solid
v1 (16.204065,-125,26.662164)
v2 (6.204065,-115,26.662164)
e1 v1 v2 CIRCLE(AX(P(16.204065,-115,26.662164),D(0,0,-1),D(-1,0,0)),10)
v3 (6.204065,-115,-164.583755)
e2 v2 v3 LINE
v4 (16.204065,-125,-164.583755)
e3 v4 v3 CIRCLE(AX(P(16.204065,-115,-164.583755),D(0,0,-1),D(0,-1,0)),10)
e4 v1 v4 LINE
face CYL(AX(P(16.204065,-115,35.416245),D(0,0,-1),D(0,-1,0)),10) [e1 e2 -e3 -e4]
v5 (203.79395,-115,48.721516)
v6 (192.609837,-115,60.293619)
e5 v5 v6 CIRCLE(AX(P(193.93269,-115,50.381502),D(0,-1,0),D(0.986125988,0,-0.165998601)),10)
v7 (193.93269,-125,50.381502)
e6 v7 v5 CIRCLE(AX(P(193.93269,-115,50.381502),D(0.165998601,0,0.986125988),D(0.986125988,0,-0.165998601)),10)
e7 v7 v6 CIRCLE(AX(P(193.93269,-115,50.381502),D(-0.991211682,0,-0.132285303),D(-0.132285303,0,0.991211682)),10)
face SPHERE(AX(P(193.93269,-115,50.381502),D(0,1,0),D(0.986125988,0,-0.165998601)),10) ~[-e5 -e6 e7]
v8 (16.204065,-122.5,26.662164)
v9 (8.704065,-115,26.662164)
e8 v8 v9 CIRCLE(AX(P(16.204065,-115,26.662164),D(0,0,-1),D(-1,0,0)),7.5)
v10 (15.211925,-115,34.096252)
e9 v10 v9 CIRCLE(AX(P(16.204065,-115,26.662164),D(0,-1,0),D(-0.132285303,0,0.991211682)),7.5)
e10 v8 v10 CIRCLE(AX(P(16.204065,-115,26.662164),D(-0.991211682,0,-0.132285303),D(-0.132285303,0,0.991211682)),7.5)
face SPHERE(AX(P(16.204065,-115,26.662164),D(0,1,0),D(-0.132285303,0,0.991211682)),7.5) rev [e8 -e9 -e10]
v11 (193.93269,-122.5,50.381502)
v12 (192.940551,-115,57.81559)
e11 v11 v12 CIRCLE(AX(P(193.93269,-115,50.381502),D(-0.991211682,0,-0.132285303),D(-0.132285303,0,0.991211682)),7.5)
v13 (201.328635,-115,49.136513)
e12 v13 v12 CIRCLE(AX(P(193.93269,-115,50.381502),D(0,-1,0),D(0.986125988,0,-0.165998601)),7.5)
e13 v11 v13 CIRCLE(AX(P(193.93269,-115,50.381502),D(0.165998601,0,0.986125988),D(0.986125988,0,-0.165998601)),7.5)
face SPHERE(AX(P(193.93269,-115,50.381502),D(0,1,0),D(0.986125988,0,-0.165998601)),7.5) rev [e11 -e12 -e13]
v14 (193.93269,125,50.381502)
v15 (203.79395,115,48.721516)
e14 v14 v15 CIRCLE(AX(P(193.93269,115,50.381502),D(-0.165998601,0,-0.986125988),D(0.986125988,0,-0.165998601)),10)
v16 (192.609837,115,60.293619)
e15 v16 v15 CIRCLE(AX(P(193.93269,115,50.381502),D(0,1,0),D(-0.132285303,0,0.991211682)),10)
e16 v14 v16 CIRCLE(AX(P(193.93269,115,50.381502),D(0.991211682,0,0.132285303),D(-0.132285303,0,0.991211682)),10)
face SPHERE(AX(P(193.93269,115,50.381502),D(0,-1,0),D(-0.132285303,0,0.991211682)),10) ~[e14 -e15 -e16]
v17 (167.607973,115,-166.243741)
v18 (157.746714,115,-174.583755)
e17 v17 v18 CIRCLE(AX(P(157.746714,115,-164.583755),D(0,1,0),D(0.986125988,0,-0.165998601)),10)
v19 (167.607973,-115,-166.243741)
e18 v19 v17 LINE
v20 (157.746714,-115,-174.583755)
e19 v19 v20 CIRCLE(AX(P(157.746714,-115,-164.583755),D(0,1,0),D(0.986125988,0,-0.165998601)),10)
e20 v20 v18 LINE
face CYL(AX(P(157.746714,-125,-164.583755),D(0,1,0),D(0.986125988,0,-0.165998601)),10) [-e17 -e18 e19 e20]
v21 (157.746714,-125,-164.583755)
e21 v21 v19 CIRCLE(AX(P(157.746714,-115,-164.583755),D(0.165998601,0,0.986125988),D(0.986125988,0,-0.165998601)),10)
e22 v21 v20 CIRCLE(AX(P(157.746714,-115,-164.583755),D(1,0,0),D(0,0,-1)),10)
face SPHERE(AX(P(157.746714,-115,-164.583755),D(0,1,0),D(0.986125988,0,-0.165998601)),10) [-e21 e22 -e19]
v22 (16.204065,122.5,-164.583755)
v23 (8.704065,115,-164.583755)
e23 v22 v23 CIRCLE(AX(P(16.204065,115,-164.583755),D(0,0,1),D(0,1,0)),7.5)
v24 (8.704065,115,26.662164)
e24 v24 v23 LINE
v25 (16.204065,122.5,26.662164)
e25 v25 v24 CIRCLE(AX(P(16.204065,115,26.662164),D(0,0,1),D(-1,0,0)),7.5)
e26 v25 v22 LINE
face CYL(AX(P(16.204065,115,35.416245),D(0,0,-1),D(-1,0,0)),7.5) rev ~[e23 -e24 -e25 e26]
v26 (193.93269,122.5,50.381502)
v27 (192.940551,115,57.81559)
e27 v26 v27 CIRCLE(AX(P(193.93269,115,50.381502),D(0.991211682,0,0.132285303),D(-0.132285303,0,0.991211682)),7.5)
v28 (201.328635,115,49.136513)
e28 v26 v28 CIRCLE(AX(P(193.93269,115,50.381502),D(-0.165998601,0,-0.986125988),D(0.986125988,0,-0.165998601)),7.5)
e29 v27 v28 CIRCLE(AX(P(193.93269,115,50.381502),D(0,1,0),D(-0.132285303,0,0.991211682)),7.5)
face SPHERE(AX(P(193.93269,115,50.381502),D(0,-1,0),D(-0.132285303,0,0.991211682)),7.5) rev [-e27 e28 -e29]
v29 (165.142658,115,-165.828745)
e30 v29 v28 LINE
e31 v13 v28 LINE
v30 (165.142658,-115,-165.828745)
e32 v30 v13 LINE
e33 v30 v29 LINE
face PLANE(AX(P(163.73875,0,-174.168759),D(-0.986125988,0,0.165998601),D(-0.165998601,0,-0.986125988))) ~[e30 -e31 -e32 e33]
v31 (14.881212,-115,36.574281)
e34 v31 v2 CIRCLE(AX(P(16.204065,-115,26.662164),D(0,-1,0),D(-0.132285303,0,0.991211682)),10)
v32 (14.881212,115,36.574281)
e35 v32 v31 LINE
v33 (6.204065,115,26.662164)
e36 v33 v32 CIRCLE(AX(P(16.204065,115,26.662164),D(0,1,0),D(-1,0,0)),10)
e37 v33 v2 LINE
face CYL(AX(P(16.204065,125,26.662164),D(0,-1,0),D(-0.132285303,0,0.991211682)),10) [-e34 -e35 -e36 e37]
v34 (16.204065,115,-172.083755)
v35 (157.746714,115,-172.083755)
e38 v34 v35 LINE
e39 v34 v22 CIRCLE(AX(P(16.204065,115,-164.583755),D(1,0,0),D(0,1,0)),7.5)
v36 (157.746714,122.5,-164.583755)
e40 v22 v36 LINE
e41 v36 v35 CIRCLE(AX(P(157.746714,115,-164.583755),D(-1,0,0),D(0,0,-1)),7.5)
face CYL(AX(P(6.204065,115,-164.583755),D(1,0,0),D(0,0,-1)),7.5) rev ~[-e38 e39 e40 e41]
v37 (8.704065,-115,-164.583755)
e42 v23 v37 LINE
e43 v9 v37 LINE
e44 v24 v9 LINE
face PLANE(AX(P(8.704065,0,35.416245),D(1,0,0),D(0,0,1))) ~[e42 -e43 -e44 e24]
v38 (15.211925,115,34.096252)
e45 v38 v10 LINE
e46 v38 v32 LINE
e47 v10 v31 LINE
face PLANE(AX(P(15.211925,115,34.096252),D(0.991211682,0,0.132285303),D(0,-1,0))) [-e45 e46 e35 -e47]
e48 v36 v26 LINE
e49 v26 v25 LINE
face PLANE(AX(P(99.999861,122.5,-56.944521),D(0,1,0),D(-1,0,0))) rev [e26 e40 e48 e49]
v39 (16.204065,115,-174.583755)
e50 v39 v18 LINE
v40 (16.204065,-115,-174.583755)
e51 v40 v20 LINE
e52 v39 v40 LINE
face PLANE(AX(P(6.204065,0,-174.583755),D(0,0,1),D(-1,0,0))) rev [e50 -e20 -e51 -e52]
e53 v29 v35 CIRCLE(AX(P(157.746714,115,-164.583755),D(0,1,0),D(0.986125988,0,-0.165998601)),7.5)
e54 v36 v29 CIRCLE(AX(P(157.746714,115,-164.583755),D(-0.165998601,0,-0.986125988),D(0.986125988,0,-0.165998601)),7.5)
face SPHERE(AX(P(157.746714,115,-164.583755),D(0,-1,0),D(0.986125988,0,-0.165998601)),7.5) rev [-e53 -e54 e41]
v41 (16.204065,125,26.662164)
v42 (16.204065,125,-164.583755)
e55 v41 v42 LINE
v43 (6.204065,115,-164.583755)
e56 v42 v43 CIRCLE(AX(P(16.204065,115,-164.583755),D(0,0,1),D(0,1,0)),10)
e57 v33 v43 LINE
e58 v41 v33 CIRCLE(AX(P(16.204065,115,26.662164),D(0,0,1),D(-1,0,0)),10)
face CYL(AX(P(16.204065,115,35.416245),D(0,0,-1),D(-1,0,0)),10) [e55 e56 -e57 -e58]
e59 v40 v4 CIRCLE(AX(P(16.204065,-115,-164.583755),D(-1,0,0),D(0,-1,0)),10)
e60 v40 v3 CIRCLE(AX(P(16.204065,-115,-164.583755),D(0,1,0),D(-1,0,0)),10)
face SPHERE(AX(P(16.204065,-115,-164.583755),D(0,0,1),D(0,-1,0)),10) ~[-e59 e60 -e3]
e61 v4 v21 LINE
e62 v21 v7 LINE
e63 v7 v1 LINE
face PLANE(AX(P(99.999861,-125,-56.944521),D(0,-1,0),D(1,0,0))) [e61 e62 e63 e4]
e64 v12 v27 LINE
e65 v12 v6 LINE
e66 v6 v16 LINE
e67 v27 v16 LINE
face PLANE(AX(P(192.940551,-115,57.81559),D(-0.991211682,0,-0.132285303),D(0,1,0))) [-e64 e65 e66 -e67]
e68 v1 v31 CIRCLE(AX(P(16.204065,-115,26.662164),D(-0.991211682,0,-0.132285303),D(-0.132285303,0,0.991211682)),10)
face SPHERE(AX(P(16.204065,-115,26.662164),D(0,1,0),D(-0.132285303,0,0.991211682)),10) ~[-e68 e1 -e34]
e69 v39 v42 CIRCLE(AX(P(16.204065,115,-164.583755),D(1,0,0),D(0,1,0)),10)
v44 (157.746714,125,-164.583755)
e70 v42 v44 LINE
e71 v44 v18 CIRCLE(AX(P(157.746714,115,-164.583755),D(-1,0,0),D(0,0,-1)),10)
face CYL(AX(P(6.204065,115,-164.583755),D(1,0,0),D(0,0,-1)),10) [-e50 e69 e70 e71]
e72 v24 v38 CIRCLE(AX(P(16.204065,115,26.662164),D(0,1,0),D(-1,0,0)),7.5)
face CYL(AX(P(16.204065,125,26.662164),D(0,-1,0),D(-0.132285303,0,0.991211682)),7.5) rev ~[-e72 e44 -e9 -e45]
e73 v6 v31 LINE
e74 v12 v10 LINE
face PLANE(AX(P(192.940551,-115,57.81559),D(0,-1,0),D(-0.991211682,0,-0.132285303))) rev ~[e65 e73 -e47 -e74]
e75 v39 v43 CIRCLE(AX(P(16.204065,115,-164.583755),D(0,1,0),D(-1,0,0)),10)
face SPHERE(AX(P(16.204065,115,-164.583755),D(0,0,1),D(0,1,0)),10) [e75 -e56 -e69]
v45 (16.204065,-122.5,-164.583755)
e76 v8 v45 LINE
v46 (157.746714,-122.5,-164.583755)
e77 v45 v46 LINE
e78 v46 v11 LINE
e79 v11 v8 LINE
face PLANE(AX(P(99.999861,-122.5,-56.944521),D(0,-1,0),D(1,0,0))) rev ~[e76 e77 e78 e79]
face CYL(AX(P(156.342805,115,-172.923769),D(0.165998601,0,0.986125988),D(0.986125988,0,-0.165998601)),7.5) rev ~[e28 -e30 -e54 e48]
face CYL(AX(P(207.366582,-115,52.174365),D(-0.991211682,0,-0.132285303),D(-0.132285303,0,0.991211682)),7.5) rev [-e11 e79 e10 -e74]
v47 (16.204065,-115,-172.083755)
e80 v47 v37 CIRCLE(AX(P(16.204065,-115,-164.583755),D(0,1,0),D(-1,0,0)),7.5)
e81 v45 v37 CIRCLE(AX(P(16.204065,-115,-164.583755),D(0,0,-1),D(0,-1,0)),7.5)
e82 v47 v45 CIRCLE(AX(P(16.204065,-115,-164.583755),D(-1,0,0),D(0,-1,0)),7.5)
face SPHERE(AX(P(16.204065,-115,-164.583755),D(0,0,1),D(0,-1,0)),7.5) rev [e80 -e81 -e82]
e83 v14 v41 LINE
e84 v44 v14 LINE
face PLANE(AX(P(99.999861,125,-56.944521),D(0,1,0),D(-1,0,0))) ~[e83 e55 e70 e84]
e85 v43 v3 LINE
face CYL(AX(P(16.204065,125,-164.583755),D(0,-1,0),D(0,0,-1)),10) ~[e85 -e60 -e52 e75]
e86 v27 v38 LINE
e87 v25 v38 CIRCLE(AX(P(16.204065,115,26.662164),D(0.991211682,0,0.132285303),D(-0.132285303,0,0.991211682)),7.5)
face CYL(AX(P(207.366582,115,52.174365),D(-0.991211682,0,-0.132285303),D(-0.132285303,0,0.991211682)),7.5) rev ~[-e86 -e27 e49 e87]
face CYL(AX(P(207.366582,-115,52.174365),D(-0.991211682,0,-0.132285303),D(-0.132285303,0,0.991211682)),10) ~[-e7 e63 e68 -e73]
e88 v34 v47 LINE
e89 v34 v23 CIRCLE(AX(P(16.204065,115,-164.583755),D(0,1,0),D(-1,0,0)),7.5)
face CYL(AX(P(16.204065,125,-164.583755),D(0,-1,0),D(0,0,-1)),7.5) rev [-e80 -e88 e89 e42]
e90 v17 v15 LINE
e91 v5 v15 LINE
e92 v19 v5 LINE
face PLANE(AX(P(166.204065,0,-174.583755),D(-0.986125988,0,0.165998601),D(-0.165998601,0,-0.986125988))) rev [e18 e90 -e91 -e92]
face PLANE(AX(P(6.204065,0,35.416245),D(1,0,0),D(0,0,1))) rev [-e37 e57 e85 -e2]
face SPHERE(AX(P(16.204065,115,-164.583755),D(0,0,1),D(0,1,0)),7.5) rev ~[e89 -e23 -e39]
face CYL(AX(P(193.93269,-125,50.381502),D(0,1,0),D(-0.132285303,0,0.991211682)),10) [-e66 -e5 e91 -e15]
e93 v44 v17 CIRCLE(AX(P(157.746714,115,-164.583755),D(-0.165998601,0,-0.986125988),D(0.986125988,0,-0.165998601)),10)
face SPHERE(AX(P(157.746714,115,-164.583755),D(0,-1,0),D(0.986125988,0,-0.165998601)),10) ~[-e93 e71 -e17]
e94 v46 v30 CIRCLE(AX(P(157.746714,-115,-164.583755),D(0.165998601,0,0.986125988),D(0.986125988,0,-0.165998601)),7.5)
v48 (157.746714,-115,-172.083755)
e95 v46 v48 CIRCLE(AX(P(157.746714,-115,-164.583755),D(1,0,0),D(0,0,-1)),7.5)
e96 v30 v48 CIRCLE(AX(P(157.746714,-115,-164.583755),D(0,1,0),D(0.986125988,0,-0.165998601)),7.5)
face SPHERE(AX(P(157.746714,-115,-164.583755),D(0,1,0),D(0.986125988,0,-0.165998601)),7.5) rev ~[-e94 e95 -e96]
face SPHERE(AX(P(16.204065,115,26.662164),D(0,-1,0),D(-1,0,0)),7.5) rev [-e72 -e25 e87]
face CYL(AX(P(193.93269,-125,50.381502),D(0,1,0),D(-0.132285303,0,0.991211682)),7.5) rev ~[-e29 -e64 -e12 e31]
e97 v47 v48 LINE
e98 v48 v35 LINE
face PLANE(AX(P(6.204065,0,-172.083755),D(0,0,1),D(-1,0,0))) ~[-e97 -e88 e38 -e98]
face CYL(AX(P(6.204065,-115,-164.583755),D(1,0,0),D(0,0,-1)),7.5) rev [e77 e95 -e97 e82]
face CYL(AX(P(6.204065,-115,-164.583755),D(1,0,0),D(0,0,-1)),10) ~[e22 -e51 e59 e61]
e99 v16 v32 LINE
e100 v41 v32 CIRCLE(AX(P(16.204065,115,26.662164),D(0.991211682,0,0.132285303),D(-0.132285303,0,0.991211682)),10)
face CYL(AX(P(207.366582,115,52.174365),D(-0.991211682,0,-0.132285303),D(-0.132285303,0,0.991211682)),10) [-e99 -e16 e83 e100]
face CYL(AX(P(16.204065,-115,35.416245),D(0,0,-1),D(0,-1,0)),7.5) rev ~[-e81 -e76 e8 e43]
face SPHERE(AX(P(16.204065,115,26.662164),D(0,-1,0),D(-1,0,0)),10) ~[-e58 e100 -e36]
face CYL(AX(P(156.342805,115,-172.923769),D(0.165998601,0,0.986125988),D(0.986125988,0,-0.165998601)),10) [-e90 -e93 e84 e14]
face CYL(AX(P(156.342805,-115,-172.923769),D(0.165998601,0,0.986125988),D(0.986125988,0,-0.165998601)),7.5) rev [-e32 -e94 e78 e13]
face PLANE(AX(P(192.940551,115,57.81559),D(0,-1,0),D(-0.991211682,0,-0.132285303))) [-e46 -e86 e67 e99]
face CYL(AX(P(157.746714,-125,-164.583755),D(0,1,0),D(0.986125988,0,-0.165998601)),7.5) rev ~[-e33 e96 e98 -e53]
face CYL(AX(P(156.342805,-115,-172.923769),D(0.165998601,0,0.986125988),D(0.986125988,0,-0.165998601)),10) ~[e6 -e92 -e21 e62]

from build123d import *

# Parameters (mm, degrees)
F1_DEPTH = 125
F3_R     = 10
F4_T     = -2.5


# Not quite as in the source:
# - a shell that OpenCascade refuses in one call is made with other operations: the cavity is built on its own and cut out


with BuildPart() as f1:
    # F0 (on Front) → F1 (new body)
    with BuildSketch(Plane.XZ):
        Polygon((206.0437292722, 62.0864819473), (6.2040649354, 35.4162448123), (6.2040649354, -174.5837551877), (166.2040649354, -174.5837551877), align=None)
    extrude(amount=F1_DEPTH)

    # F2: F1 across plane


with BuildPart() as f1_1:
    add(f1.part)
    add(f1.part.mirror(Plane.XZ))

    # F3
    f3_edges = [f1_1.edges().sort_by_distance(p)[0] for p in [
        (106.123897, -125, 48.751363),
        (206.043729, 0, 62.086482),
        (186.123897, -125, -56.248637),
        (6.204065, -125, -69.583755),
        (86.204065, -125, -174.583755),
        (166.204065, 0, -174.583755),
        (106.123897, 125, 48.751363),
        (6.204065, 0, 35.416245),
        (186.123897, 125, -56.248637),
        (6.204065, 125, -69.583755),
        (86.204065, 125, -174.583755),
        (6.204065, 0, -174.583755),
    ]]
    fillet(f3_edges, radius=F3_R)

    # F4: a shell. OpenCascade refuses it in one call, so the cavity is built on its own and cut out:
    # the body offset inwards by the wall thickness, plus a prism from it out through each open face.
    f4_core = offset(f1_1.part, amount=F4_T, mode=Mode.PRIVATE)
    f4_exits = [f4_core.faces().sort_by_distance(p)[0] for p in [
        (104.076238, 0, 45.955921),
    ]]
    add(f4_core, mode=Mode.SUBTRACT)
    extrude(f4_exits, amount=-F4_T, mode=Mode.SUBTRACT)


solid = f1_1.part
